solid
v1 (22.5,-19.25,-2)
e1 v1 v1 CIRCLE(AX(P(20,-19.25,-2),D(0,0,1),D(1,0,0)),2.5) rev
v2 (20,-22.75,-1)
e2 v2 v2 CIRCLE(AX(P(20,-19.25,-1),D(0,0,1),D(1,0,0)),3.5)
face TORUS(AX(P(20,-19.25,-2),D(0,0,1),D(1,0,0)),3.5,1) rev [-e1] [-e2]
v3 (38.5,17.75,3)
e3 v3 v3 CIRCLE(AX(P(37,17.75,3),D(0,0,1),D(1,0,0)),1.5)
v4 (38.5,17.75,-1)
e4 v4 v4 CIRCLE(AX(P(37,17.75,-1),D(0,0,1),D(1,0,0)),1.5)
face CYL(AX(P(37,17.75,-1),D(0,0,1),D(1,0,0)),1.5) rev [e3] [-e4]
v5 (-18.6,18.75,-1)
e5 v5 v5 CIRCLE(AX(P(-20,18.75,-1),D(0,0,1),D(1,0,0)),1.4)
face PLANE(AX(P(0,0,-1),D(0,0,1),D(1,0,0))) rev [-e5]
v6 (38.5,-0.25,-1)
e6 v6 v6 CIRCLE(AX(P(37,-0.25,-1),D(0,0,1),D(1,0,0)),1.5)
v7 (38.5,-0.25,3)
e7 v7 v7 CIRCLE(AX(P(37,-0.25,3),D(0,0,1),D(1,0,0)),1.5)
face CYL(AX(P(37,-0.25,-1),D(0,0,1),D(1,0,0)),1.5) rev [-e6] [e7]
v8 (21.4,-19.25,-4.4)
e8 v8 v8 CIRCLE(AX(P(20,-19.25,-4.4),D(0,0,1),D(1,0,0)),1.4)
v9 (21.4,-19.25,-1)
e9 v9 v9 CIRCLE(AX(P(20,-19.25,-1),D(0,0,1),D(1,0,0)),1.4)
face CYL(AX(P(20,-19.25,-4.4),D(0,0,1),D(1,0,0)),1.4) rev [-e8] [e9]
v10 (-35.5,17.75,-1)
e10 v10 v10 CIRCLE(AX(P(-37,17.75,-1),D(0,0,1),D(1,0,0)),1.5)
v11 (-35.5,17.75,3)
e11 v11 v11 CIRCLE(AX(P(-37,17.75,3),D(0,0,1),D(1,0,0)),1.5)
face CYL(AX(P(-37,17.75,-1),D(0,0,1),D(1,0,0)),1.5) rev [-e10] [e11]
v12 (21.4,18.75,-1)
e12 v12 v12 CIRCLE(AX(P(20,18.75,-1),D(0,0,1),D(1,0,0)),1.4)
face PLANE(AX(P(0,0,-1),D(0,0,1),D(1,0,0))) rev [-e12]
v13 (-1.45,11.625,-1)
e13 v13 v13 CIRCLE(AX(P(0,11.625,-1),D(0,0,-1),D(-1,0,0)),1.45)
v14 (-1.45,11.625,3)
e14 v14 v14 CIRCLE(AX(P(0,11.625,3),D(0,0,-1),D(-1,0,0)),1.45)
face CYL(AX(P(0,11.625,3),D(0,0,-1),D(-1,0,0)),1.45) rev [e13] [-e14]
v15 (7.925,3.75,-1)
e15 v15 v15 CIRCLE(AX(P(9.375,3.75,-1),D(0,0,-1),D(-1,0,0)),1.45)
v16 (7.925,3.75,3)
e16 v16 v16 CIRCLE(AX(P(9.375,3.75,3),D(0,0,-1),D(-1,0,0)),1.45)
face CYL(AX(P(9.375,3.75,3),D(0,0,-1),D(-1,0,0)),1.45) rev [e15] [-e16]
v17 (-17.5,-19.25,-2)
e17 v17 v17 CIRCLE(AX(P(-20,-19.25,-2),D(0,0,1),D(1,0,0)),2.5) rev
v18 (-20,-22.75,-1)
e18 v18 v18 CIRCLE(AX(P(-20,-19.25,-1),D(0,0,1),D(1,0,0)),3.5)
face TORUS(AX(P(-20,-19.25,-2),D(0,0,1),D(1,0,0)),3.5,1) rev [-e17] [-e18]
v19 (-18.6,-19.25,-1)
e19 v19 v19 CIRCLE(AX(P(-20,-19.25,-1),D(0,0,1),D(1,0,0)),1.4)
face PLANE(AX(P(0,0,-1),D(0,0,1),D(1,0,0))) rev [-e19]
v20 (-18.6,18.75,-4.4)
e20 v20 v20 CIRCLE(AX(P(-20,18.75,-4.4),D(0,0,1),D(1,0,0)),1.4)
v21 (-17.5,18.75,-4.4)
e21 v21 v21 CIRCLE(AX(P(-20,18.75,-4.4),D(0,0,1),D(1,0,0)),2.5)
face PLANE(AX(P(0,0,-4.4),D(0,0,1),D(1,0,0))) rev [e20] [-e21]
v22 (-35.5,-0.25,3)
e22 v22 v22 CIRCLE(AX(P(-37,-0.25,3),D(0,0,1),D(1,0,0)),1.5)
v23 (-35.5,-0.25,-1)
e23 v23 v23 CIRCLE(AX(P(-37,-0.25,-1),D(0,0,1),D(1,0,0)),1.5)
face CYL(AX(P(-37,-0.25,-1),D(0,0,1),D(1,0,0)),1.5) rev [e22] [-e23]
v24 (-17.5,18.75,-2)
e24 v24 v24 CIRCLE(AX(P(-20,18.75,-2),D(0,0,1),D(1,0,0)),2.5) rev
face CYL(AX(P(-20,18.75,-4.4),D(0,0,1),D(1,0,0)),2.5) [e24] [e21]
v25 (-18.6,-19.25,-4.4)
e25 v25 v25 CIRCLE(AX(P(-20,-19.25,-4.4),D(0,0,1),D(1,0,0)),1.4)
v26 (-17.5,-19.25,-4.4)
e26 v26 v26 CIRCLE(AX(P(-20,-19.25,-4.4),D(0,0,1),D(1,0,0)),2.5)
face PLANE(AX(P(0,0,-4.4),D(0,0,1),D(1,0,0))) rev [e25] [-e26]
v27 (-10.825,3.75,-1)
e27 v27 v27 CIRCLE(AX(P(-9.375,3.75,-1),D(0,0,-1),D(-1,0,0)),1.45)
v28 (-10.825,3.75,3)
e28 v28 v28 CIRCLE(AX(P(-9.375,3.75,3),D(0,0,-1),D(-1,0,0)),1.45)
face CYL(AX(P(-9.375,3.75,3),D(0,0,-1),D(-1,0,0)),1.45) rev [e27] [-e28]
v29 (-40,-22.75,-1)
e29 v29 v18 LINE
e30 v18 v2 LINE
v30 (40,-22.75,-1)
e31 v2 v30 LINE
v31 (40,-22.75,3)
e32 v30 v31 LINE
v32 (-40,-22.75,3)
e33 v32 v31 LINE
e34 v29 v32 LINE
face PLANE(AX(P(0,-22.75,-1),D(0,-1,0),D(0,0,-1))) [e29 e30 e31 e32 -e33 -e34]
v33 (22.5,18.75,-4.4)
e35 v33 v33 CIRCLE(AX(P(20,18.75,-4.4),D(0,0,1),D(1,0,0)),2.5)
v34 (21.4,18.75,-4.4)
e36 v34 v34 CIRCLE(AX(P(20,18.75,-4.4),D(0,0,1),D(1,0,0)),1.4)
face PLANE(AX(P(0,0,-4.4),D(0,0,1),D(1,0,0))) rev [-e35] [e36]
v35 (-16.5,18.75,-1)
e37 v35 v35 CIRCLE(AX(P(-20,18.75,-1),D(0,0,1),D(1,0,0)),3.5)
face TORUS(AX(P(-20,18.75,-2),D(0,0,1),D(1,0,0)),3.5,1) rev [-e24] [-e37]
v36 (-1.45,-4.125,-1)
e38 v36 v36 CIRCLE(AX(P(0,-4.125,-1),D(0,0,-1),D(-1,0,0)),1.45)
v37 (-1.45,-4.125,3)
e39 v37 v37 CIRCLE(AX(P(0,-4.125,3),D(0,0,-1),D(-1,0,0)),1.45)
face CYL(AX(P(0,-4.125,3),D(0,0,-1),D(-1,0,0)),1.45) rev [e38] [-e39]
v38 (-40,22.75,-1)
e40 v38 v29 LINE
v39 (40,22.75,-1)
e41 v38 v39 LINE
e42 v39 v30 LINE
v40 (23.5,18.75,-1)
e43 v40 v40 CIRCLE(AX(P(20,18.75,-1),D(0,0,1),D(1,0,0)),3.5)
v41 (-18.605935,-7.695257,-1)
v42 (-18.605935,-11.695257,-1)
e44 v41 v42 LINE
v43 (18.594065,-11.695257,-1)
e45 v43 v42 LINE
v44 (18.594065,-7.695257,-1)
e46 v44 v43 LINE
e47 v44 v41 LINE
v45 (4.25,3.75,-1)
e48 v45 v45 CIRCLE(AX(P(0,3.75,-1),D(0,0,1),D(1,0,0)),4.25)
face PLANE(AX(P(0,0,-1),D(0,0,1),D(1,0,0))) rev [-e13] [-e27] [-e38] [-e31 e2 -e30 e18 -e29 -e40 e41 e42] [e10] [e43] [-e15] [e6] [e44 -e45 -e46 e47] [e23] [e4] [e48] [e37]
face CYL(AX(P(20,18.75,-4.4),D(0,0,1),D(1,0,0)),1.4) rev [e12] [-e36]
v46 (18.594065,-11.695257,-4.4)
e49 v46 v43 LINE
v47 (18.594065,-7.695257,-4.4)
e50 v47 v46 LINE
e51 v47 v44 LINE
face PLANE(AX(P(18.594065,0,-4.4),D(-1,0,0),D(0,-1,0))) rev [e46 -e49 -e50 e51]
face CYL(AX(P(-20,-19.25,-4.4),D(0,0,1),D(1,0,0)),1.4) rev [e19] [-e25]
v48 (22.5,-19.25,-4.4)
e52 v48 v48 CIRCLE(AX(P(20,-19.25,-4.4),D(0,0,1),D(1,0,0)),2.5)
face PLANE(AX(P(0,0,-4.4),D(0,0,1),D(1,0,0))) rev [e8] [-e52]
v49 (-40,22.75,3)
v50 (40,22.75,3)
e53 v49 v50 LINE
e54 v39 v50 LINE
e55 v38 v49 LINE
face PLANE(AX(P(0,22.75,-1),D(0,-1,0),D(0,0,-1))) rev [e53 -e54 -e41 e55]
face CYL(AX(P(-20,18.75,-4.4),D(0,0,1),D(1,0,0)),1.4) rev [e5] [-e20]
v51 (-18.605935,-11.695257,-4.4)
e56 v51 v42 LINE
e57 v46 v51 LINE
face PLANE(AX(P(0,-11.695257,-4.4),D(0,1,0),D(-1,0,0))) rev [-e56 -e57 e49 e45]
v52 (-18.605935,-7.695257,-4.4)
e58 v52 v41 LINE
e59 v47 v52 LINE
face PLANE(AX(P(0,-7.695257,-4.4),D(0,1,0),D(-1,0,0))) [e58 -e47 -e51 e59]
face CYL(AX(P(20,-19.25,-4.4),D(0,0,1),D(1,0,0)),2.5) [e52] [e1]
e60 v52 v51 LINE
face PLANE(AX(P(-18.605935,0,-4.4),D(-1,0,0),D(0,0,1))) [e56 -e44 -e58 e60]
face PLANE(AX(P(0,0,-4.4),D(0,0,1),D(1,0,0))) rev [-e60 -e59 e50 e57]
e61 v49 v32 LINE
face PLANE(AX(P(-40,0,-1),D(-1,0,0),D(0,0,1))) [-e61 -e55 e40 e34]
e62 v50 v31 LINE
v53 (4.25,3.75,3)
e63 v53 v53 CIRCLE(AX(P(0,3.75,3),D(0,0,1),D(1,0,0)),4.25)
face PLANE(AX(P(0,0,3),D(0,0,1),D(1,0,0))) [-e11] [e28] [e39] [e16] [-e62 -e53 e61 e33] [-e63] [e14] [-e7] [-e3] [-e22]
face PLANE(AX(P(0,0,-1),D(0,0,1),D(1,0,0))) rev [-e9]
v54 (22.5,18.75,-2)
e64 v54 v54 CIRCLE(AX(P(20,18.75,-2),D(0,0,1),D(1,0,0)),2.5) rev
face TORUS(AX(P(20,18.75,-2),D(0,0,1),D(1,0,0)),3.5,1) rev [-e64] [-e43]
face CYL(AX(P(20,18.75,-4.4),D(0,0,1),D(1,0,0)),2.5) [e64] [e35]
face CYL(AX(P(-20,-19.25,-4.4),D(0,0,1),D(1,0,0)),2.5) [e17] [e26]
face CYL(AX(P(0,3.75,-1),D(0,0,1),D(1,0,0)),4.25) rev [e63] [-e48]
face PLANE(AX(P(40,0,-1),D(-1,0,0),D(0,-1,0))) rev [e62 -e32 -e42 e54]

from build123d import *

# Parameters (mm, degrees)
BOSS_EXTRUDE5_DEPTH      = 3
BOSS_EXTRUDE5_DEPTH_BACK = 1
SKETCH2_W                = 80
SKETCH2_H                = 45.5
SKETCH2_R                = 2.5
SKETCH2_R_2              = 1.5
SKETCH2_R_3              = 4.25
SKETCH2_W_2              = 37.2
SKETCH2_H_2              = 4
SKETCH2_R_4              = 1.4
SKETCH2_8_R              = 2.5
SKETCH2_8_R_2            = 1.4
SKETCH2_8_W              = 37.2
SKETCH2_8_H              = 4
BOSS_EXTRUDE6_DEPTH      = 4.4
SKETCH7_R                = 1.45
CUT_EXTRUDE3_DEPTH       = 47.19050227
FILLET1_R                = 1


with BuildPart() as part:
    # Sketch2 → Boss-Extrude5 (new, two sides: drawn at the far end of the back side and taken through both)
    # profile 1 of 18: a face of its own
    with BuildSketch(Plane.XY.offset(-BOSS_EXTRUDE5_DEPTH_BACK)):
        Rectangle(SKETCH2_W, SKETCH2_H)
        with Locations((-8.718645076, -4.968645076)):
            Circle(SKETCH2_R, mode=Mode.SUBTRACT)
        with Locations((8.718645076, -4.968645076)):
            Circle(SKETCH2_R, mode=Mode.SUBTRACT)
        with Locations((8.718645076, 12.468645076)):
            Circle(SKETCH2_R, mode=Mode.SUBTRACT)
        with Locations((-8.718645076, 12.468645076)):
            Circle(SKETCH2_R, mode=Mode.SUBTRACT)
        with Locations((20, -19.25)):
            Circle(SKETCH2_R, mode=Mode.SUBTRACT)
        with Locations((-20, -19.25)):
            Circle(SKETCH2_R, mode=Mode.SUBTRACT)
        with Locations((20, 18.75)):
            Circle(SKETCH2_R, mode=Mode.SUBTRACT)
        with Locations((-20, 18.75)):
            Circle(SKETCH2_R, mode=Mode.SUBTRACT)
        with Locations((-37, 17.75)):
            Circle(SKETCH2_R_2, mode=Mode.SUBTRACT)
        with Locations((-37, -0.25)):
            Circle(SKETCH2_R_2, mode=Mode.SUBTRACT)
        with Locations((37, -0.25)):
            Circle(SKETCH2_R_2, mode=Mode.SUBTRACT)
        with Locations((37, 17.75)):
            Circle(SKETCH2_R_2, mode=Mode.SUBTRACT)
        with Locations((0, 3.75)):
            Circle(SKETCH2_R_3, mode=Mode.SUBTRACT)
        with Locations((-0.005934964, -9.695257034)):
            Rectangle(SKETCH2_W_2, SKETCH2_H_2, mode=Mode.SUBTRACT)
    # profile 2 of 18: a face of its own
    with BuildSketch(Plane.XY.offset(-BOSS_EXTRUDE5_DEPTH_BACK)):
        with Locations((-20, 18.75)):
            Circle(SKETCH2_R)
        with Locations((-20, 18.75)):
            Circle(SKETCH2_R_4, mode=Mode.SUBTRACT)
    # profile 3 of 18: a face of its own
    with BuildSketch(Plane.XY.offset(-BOSS_EXTRUDE5_DEPTH_BACK)):
        with Locations((-20, 18.75)):
            Circle(SKETCH2_R_4)
    # profile 4 of 18: a face of its own
    with BuildSketch(Plane.XY.offset(-BOSS_EXTRUDE5_DEPTH_BACK)):
        with Locations((-8.718645076, 12.468645076)):
            Circle(SKETCH2_R)
        with Locations((-8.718645076, 12.468645076)):
            Circle(SKETCH2_R_2, mode=Mode.SUBTRACT)
    # profile 5 of 18: a face of its own
    with BuildSketch(Plane.XY.offset(-BOSS_EXTRUDE5_DEPTH_BACK)):
        with Locations((-8.718645076, 12.468645076)):
            Circle(SKETCH2_R_2)
    # profile 6 of 18: a face of its own
    with BuildSketch(Plane.XY.offset(-BOSS_EXTRUDE5_DEPTH_BACK)):
        with Locations((8.718645076, 12.468645076)):
            Circle(SKETCH2_R)
        with Locations((8.718645076, 12.468645076)):
            Circle(SKETCH2_R_2, mode=Mode.SUBTRACT)
    # profile 7 of 18: a face of its own
    with BuildSketch(Plane.XY.offset(-BOSS_EXTRUDE5_DEPTH_BACK)):
        with Locations((8.718645076, 12.468645076)):
            Circle(SKETCH2_R_2)
    # profile 8 of 18: a face of its own
    with BuildSketch(Plane.XY.offset(-BOSS_EXTRUDE5_DEPTH_BACK)):
        with Locations((-8.718645076, -4.968645076)):
            Circle(SKETCH2_R)
        with Locations((-8.718645076, -4.968645076)):
            Circle(SKETCH2_R_2, mode=Mode.SUBTRACT)
    # profile 9 of 18: a face of its own
    with BuildSketch(Plane.XY.offset(-BOSS_EXTRUDE5_DEPTH_BACK)):
        with Locations((-8.718645076, -4.968645076)):
            Circle(SKETCH2_R_2)
    # profile 10 of 18: a face of its own
    with BuildSketch(Plane.XY.offset(-BOSS_EXTRUDE5_DEPTH_BACK)):
        with Locations((8.718645076, -4.968645076)):
            Circle(SKETCH2_R)
        with Locations((8.718645076, -4.968645076)):
            Circle(SKETCH2_R_2, mode=Mode.SUBTRACT)
    # profile 11 of 18: a face of its own
    with BuildSketch(Plane.XY.offset(-BOSS_EXTRUDE5_DEPTH_BACK)):
        with Locations((8.718645076, -4.968645076)):
            Circle(SKETCH2_R_2)
    # profile 12 of 18: a face of its own
    with BuildSketch(Plane.XY.offset(-BOSS_EXTRUDE5_DEPTH_BACK)):
        with Locations((20, 18.75)):
            Circle(SKETCH2_R)
        with Locations((20, 18.75)):
            Circle(SKETCH2_R_4, mode=Mode.SUBTRACT)
    # profile 13 of 18: a face of its own
    with BuildSketch(Plane.XY.offset(-BOSS_EXTRUDE5_DEPTH_BACK)):
        with Locations((20, 18.75)):
            Circle(SKETCH2_R_4)
    # profile 14 of 18: a face of its own
    with BuildSketch(Plane.XY.offset(-BOSS_EXTRUDE5_DEPTH_BACK)):
        with Locations((-0.005934964, -9.695257034)):
            Rectangle(SKETCH2_W_2, SKETCH2_H_2)
    # profile 15 of 18: a face of its own
    with BuildSketch(Plane.XY.offset(-BOSS_EXTRUDE5_DEPTH_BACK)):
        with Locations((20, -19.25)):
            Circle(SKETCH2_R)
        with Locations((20, -19.25)):
            Circle(SKETCH2_R_4, mode=Mode.SUBTRACT)
    # profile 16 of 18: a face of its own
    with BuildSketch(Plane.XY.offset(-BOSS_EXTRUDE5_DEPTH_BACK)):
        with Locations((20, -19.25)):
            Circle(SKETCH2_R_4)
    # profile 17 of 18: a face of its own
    with BuildSketch(Plane.XY.offset(-BOSS_EXTRUDE5_DEPTH_BACK)):
        with Locations((-20, -19.25)):
            Circle(SKETCH2_R)
        with Locations((-20, -19.25)):
            Circle(SKETCH2_R_4, mode=Mode.SUBTRACT)
    # profile 18 of 18: a face of its own
    with BuildSketch(Plane.XY.offset(-BOSS_EXTRUDE5_DEPTH_BACK)):
        with Locations((-20, -19.25)):
            Circle(SKETCH2_R_4)
    extrude(amount=BOSS_EXTRUDE5_DEPTH + BOSS_EXTRUDE5_DEPTH_BACK)

    # Sketch2<8> → Boss-Extrude6 (add)
    # profile 1 of 5: a face of its own
    with BuildSketch(Plane.XY):
        with Locations((20, 18.75)):
            Circle(SKETCH2_8_R)
        with Locations((20, 18.75)):
            Circle(SKETCH2_8_R_2, mode=Mode.SUBTRACT)
    # profile 2 of 5: a face of its own
    with BuildSketch(Plane.XY):
        with Locations((-20, 18.75)):
            Circle(SKETCH2_8_R)
        with Locations((-20, 18.75)):
            Circle(SKETCH2_8_R_2, mode=Mode.SUBTRACT)
    # profile 3 of 5: a face of its own
    with BuildSketch(Plane.XY):
        with Locations((-20, -19.25)):
            Circle(SKETCH2_8_R)
        with Locations((-20, -19.25)):
            Circle(SKETCH2_8_R_2, mode=Mode.SUBTRACT)
    # profile 4 of 5: a face of its own
    with BuildSketch(Plane.XY):
        with Locations((-0.005934964, -9.695257034)):
            Rectangle(SKETCH2_8_W, SKETCH2_8_H)
    # profile 5 of 5: a face of its own
    with BuildSketch(Plane.XY):
        with Locations((20, -19.25)):
            Circle(SKETCH2_8_R)
        with Locations((20, -19.25)):
            Circle(SKETCH2_8_R_2, mode=Mode.SUBTRACT)
    extrude(amount=-BOSS_EXTRUDE6_DEPTH)

    # Sketch7 → Cut-Extrude3 (cut, through all)
    with BuildSketch(Plane(origin=(0, 0, -1), x_dir=(-1, 0, 0), z_dir=(0, 0, -1))):
        with Locations((0, -4.125)):
            Circle(SKETCH7_R)
        with Locations((9.375, 3.75)):
            Circle(SKETCH7_R)
        with Locations((0, 11.625)):
            Circle(SKETCH7_R)
        with Locations((-9.375, 3.75)):
            Circle(SKETCH7_R)
    extrude(amount=-CUT_EXTRUDE3_DEPTH, mode=Mode.SUBTRACT)

    # Fillet1
    fillet1_edges = [part.edges().sort_by_distance(p)[0] for p in [
        (17.5, 18.75, -1),
        (-22.5, 18.75, -1),
        (-22.5, -19.25, -1),
        (17.5, -19.25, -1),
    ]]
    fillet(fillet1_edges, radius=FILLET1_R - 0.0001)  # a hair under: the kernel refuses the full size


solid = part.part
